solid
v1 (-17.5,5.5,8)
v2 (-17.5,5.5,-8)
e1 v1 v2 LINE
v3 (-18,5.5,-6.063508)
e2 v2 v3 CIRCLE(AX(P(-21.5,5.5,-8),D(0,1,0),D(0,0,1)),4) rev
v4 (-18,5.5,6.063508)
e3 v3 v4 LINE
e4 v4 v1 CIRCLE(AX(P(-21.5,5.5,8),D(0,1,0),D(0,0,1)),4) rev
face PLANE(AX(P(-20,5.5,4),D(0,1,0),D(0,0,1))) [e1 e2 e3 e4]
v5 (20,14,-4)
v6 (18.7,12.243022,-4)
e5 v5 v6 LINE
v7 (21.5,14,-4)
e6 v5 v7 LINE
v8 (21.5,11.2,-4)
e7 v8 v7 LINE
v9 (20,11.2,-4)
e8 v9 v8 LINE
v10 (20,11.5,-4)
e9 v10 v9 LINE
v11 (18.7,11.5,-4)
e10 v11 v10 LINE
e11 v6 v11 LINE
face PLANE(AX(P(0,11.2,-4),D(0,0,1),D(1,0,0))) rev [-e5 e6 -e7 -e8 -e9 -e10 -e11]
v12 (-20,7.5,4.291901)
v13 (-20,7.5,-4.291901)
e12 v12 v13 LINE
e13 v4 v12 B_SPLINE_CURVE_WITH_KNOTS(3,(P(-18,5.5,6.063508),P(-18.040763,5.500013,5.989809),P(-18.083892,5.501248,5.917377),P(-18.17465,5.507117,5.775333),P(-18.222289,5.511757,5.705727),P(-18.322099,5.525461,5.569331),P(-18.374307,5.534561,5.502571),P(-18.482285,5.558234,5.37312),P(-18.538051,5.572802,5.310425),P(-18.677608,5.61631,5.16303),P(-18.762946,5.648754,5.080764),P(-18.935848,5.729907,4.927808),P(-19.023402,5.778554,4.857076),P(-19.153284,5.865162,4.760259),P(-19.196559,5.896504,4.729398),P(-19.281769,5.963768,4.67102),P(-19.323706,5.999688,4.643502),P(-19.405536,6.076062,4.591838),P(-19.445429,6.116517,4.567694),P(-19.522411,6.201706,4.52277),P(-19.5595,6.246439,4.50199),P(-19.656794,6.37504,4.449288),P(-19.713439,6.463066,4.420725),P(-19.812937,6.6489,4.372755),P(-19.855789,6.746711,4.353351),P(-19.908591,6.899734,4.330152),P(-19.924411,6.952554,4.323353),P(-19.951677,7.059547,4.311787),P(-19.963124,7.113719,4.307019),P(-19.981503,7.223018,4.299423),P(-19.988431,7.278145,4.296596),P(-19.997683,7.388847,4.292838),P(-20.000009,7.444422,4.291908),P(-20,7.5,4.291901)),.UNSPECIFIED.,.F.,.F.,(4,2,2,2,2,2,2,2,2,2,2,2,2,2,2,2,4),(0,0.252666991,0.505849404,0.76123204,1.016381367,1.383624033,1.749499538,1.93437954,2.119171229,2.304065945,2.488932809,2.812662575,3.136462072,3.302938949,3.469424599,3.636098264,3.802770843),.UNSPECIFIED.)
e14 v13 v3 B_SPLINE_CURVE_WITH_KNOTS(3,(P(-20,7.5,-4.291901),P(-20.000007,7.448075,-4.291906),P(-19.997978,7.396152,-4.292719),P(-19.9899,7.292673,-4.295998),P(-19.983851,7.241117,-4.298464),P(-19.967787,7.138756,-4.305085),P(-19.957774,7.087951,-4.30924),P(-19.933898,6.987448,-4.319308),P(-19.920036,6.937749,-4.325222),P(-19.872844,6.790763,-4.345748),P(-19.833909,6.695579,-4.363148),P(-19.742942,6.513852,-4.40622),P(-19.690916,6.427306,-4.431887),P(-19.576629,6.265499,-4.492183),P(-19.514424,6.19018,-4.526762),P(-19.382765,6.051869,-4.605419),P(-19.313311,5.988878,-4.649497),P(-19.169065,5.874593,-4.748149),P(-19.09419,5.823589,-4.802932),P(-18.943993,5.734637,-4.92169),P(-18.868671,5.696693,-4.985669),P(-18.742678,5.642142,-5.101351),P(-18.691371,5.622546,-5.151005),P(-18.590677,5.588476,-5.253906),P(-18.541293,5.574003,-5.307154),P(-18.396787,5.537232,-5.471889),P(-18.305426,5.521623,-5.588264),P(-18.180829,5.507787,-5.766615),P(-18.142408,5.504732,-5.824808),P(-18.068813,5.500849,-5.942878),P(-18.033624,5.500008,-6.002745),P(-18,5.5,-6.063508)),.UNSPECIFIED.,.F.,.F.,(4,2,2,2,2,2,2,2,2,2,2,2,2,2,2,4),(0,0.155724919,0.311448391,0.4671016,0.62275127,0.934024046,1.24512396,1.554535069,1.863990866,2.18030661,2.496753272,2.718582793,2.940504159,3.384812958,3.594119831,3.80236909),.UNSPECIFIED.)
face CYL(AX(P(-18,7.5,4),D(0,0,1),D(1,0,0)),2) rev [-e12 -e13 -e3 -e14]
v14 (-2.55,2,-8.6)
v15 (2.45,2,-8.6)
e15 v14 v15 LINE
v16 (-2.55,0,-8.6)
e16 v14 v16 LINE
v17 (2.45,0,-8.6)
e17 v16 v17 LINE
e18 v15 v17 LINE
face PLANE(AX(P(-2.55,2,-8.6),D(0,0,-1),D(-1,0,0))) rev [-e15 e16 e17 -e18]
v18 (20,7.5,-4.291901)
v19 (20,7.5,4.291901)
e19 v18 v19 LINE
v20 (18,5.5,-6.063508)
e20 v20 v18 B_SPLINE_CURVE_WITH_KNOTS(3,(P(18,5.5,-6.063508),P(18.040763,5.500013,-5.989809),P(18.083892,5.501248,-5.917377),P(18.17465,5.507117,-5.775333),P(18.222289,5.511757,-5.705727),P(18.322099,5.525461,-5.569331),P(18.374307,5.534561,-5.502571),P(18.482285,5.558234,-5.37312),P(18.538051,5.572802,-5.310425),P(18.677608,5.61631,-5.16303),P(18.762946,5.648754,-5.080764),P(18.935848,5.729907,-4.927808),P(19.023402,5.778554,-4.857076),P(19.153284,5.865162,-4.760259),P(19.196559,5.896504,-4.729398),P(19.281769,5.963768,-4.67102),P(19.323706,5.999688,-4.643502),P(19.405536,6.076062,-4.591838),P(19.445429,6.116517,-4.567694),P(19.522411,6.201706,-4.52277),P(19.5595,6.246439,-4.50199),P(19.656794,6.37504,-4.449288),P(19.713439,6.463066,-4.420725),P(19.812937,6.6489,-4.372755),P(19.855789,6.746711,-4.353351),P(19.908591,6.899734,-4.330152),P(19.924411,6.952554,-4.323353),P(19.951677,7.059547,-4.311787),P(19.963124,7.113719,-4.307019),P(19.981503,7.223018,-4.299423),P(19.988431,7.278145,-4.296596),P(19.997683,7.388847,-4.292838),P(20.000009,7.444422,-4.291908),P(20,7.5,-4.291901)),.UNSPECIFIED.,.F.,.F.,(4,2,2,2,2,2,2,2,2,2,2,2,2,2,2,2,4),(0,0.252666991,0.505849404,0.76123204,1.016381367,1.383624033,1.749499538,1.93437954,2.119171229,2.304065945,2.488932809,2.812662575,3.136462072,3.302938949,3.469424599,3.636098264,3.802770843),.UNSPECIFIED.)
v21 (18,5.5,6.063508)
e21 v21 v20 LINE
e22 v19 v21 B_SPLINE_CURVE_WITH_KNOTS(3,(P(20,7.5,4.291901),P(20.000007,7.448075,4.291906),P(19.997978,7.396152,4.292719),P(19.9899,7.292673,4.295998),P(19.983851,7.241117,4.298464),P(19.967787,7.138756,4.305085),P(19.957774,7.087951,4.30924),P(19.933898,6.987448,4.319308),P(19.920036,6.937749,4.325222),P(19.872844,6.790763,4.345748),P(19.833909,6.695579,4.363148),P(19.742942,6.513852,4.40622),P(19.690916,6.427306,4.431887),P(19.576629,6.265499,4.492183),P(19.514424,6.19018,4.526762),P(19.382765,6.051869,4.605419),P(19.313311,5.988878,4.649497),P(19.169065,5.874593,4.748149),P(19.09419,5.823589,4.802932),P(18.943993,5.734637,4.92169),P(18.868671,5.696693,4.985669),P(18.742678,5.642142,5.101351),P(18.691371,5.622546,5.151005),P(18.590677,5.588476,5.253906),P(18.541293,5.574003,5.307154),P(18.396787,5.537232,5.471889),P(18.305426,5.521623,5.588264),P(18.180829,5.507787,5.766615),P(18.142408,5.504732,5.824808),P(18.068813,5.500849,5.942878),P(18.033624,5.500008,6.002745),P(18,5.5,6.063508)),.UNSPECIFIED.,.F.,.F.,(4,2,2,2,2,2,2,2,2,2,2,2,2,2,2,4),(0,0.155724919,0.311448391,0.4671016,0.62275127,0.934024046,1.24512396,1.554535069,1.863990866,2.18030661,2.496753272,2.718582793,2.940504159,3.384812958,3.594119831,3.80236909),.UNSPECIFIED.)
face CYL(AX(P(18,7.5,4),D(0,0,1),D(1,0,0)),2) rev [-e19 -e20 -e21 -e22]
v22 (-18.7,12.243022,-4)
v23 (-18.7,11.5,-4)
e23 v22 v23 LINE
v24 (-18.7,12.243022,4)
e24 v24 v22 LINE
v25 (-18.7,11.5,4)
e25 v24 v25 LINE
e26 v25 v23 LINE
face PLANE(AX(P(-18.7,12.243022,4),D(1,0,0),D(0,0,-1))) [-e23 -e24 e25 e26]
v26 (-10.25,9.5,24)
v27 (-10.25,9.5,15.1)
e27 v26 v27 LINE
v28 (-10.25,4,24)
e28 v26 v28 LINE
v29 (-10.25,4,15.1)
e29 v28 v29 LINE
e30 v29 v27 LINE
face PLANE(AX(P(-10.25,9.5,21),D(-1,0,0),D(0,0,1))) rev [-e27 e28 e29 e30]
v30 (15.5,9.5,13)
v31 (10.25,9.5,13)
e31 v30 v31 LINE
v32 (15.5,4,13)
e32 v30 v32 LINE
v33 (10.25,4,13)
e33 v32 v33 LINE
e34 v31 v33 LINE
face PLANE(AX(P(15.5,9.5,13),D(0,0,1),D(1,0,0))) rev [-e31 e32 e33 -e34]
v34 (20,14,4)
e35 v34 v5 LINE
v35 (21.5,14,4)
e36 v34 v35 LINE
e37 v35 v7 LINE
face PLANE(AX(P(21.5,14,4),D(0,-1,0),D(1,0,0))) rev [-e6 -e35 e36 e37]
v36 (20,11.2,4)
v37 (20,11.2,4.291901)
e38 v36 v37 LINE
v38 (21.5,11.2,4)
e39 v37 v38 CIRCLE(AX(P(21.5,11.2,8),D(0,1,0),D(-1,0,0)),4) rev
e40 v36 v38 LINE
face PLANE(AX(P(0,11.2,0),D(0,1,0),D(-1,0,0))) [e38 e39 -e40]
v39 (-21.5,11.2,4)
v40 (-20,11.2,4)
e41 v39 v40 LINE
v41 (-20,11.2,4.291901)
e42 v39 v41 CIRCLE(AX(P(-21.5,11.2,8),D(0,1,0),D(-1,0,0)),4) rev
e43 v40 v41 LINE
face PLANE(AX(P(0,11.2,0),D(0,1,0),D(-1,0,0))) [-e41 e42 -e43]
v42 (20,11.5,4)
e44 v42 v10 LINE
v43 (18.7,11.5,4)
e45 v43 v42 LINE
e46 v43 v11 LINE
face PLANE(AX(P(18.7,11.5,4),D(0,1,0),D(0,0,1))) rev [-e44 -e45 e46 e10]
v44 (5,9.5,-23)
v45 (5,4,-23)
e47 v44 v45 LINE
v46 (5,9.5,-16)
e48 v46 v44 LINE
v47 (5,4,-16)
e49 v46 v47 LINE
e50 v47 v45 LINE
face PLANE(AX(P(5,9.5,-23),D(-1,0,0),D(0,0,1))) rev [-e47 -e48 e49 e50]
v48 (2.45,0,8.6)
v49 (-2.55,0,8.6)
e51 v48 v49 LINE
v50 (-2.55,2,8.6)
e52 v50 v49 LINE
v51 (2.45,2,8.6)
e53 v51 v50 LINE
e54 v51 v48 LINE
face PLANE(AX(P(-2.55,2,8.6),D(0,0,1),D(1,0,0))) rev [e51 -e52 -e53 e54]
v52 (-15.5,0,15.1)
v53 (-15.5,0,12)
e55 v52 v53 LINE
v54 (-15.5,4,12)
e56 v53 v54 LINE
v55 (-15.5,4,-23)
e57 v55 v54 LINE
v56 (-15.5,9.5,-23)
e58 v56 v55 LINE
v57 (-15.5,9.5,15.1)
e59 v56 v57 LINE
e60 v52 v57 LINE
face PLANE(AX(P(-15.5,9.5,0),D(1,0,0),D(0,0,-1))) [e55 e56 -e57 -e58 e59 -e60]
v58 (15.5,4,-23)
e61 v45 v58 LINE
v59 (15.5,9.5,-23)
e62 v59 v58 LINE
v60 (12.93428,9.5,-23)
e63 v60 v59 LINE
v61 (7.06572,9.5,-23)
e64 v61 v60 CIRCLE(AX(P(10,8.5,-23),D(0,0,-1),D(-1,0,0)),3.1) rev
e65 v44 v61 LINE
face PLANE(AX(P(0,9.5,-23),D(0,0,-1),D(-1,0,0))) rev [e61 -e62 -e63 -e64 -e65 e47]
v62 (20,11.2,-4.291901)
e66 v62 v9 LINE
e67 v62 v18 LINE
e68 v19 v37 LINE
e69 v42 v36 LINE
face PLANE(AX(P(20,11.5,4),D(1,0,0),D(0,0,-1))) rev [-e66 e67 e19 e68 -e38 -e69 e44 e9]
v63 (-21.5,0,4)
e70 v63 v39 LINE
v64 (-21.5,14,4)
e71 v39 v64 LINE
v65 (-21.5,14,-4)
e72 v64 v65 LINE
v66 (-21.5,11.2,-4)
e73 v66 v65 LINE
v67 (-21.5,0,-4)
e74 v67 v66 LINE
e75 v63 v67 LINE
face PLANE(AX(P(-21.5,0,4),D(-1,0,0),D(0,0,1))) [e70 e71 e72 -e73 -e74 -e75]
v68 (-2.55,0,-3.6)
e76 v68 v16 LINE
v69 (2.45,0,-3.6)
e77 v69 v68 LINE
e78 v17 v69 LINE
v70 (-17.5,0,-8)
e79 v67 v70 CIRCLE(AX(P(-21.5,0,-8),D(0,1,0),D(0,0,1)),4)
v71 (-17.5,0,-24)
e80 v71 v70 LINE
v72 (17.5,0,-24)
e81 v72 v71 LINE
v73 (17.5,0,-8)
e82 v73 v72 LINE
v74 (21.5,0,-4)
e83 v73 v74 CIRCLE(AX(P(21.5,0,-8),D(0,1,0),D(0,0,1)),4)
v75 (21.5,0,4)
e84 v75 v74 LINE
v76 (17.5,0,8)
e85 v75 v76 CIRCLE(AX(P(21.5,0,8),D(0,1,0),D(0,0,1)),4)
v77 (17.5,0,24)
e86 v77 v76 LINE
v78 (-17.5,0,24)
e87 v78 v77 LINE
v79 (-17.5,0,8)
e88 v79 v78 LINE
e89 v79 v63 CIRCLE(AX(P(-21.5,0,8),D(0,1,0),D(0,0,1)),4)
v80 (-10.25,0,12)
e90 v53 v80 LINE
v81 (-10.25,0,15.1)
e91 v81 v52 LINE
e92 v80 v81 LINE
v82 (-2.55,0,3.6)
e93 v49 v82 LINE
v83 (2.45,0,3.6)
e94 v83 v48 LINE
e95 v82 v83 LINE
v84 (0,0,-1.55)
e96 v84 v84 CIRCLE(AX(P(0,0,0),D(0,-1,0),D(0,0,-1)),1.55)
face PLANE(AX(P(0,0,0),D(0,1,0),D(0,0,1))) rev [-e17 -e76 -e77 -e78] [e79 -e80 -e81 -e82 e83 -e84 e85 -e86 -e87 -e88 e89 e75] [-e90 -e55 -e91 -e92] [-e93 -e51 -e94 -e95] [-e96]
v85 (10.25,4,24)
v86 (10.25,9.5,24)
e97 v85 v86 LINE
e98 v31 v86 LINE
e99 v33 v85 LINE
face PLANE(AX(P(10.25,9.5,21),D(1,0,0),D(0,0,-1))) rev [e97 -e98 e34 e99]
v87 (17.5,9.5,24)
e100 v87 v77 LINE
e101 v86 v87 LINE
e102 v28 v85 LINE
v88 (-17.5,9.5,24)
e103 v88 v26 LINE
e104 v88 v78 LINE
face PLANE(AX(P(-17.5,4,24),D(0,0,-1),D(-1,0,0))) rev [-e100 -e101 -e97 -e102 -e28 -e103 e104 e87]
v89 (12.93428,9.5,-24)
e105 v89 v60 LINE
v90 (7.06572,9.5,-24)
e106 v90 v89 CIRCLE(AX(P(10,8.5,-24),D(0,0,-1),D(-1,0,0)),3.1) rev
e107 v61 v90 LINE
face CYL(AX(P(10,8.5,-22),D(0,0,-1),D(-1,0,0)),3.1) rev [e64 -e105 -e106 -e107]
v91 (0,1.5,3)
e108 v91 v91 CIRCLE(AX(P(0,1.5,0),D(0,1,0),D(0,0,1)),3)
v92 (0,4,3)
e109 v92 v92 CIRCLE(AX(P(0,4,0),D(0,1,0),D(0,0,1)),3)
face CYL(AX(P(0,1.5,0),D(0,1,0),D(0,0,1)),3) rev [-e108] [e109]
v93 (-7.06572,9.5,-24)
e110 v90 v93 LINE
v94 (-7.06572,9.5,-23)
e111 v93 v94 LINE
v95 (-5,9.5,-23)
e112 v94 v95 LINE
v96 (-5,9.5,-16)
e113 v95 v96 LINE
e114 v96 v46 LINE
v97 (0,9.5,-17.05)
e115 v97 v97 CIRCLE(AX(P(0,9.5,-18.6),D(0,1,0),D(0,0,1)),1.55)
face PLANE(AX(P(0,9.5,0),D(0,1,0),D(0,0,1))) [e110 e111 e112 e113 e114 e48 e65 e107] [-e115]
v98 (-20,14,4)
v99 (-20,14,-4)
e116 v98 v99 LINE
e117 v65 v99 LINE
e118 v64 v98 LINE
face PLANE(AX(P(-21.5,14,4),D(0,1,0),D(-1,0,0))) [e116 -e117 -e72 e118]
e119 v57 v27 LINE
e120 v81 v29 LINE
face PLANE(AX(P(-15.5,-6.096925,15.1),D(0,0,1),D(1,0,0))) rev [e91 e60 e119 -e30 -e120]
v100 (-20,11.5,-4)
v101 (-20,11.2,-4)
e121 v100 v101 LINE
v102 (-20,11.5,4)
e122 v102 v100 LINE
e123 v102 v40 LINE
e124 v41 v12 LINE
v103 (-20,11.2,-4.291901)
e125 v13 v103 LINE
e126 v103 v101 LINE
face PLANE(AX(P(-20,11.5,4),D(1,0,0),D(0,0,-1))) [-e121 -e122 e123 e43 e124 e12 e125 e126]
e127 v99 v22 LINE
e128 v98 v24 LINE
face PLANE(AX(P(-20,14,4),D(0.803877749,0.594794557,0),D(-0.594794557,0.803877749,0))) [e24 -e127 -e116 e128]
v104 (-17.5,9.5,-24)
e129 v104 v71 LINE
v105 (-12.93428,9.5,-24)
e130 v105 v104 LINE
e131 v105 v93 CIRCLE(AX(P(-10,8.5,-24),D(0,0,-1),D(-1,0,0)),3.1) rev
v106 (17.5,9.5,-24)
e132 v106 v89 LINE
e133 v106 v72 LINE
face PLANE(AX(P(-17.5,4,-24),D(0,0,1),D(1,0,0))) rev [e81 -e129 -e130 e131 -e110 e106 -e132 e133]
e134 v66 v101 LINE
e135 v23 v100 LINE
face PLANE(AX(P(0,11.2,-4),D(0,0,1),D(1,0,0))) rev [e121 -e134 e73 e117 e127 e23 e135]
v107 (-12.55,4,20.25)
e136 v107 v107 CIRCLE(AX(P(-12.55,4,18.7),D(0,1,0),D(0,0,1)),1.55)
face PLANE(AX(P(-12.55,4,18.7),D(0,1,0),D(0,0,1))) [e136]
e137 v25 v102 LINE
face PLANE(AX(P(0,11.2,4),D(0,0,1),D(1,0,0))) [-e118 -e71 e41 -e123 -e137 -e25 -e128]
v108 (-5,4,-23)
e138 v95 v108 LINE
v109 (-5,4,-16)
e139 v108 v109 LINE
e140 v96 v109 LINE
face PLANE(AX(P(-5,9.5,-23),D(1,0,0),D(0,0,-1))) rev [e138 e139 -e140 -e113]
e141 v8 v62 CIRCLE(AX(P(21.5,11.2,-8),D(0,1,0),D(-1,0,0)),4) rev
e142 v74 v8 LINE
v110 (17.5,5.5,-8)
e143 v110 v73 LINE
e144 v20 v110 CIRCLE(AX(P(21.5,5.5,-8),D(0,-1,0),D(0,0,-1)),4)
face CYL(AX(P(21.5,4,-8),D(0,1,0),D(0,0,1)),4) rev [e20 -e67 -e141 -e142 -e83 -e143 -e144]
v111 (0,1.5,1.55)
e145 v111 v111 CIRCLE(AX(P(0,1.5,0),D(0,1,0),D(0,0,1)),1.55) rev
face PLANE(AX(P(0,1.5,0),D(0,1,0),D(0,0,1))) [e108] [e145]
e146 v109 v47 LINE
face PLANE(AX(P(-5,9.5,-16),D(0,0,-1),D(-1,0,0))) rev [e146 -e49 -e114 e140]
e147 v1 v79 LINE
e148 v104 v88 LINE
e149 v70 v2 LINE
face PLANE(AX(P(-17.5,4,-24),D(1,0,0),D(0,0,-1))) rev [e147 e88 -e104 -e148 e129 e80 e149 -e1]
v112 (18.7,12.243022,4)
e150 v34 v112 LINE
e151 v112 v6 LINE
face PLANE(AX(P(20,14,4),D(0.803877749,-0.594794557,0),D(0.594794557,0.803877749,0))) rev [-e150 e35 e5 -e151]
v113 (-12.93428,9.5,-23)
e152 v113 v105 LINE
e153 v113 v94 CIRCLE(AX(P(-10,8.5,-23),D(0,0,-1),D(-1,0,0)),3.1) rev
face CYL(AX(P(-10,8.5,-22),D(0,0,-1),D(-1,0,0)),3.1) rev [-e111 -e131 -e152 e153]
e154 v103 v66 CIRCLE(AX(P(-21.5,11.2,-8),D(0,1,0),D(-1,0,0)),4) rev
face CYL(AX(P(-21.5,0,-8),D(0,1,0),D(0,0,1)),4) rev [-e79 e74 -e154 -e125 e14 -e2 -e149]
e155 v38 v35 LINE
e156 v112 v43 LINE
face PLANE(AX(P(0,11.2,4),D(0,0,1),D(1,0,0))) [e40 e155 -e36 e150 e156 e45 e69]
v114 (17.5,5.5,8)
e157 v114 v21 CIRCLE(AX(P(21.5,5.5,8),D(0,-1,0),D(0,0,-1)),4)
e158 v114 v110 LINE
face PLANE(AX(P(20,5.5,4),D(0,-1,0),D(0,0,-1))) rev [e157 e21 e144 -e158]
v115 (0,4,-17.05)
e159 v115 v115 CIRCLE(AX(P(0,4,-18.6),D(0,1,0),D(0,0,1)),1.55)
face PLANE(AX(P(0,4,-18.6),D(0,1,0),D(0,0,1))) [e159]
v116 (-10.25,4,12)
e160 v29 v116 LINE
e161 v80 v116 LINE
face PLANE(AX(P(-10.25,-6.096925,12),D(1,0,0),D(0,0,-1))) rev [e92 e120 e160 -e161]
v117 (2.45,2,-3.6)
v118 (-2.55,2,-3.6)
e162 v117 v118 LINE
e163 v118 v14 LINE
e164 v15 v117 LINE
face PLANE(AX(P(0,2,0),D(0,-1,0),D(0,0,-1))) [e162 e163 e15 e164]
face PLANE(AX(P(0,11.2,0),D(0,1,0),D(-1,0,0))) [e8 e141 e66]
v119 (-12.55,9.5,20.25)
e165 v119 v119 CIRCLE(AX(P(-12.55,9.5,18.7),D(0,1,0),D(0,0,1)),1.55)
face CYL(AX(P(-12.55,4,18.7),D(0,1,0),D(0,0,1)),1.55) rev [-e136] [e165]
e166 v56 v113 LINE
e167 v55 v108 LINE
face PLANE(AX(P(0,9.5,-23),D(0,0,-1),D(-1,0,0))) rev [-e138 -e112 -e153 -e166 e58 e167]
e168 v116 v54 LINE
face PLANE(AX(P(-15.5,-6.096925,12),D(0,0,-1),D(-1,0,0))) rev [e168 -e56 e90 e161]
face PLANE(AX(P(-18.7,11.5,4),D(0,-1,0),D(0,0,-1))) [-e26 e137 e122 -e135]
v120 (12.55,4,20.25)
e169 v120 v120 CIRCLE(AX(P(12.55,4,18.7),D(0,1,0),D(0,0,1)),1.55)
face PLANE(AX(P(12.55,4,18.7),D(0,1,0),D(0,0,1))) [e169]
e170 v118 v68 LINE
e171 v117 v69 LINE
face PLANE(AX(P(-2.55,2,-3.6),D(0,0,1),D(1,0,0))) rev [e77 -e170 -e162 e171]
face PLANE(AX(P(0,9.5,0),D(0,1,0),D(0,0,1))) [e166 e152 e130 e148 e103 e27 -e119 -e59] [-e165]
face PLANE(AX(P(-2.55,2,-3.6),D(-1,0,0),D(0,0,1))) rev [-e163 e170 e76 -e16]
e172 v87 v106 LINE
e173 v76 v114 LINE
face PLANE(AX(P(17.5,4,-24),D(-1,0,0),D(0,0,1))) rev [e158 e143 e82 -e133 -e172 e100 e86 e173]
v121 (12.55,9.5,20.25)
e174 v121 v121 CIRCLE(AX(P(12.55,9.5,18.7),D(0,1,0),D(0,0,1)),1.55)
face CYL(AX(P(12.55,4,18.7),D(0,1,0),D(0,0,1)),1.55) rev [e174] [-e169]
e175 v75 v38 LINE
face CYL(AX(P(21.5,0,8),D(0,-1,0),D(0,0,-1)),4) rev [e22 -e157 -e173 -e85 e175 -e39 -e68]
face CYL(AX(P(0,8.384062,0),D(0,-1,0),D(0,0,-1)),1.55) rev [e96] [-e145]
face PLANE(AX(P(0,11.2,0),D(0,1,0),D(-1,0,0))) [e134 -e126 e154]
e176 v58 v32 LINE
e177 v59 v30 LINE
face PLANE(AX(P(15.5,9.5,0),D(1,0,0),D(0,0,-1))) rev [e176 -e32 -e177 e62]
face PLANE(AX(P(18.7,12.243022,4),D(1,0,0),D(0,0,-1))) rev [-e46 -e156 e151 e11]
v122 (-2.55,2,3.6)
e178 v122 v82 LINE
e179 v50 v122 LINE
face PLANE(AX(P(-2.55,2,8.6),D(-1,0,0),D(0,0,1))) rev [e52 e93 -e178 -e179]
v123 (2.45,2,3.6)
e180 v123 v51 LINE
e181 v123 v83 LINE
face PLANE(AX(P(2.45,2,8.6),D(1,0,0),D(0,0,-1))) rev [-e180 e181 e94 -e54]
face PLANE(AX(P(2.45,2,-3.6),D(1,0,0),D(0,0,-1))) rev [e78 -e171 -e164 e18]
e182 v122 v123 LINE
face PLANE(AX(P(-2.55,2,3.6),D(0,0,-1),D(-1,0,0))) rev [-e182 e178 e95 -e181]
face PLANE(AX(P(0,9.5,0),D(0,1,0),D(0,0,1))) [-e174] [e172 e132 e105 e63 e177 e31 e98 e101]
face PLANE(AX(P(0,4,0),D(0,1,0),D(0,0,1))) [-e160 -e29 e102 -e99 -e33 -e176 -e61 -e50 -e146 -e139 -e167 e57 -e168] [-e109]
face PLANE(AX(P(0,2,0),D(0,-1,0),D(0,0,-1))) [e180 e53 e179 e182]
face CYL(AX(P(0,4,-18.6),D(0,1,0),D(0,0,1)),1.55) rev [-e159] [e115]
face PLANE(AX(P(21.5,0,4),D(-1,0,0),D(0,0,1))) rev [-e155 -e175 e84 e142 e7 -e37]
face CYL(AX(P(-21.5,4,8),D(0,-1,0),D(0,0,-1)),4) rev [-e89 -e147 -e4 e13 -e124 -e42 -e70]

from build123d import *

# Parameters (mm, degrees)
SKETCH1_W           = 35
SKETCH1_H           = 48
BOSS_EXTRUDE1_DEPTH = 4
SKETCH2_W           = 35
SKETCH2_H           = 48
SKETCH2_W_2         = 31
SKETCH2_H_2         = 44
BOSS_EXTRUDE2_DEPTH = 5.5
SKETCH3_W           = 10
SKETCH3_H           = 7
SKETCH3_W_2         = 5.25
SKETCH3_H_2         = 8
BOSS_EXTRUDE3_DEPTH = 5.5
SKETCH4_W           = 20.5
SKETCH4_H           = 5.5
CUT_EXTRUDE1_DEPTH  = 11
CUT_EXTRUDE2_DEPTH  = 2
CUT_EXTRUDE3_REACH  = 33.185
SKETCH7_W           = 5.25
SKETCH7_H           = 3.1
CUT_EXTRUDE4_START  = 9.5
SKETCH8_R           = 1.55
CUT_EXTRUDE4_DEPTH  = 5.5
SKETCH5_W           = 5
SKETCH5_H           = 5
CUT_EXTRUDE5_DEPTH  = 2
SKETCH10_R          = 1.55
CUT_EXTRUDE6_DEPTH  = 4
SKETCH11_R          = 3
CUT_EXTRUDE7_DEPTH  = 2.5
BOSS_EXTRUDE5_DEPTH = 4
FILLET1_R           = 4
FILLET2_R           = 2
FILLET3_R           = 4
FILLET4_R           = 2
SKETCH14_W          = 45
SKETCH14_H          = 12
CUT_EXTRUDE11_DEPTH = 2.8


with BuildPart() as part:
    # Sketch1 → Boss-Extrude1 (new body)
    with BuildSketch(Plane(origin=(0, 0, 0), x_dir=(1, 0, 0), z_dir=(0, 1, 0))):
        Rectangle(SKETCH1_W, SKETCH1_H)
    extrude(amount=BOSS_EXTRUDE1_DEPTH)

    # Sketch2 → Boss-Extrude2 (add)
    with BuildSketch(Plane(origin=(0, 4, 0), x_dir=(1, 0, 0), z_dir=(0, 1, 0))):
        Rectangle(SKETCH2_W, SKETCH2_H)
        with Locations((0, 1)):
            Rectangle(SKETCH2_W_2, SKETCH2_H_2, mode=Mode.SUBTRACT)
    extrude(amount=BOSS_EXTRUDE2_DEPTH)

    # Sketch3 → Boss-Extrude3 (add)
    with BuildSketch(Plane(origin=(0, 4, 0), x_dir=(1, 0, 0), z_dir=(0, 1, 0))):
        with Locations((0, 19.5)):
            Rectangle(SKETCH3_W, SKETCH3_H)
        with Locations((-12.875, -17)):
            Rectangle(SKETCH3_W_2, SKETCH3_H_2)
        with Locations((12.875, -17)):
            Rectangle(SKETCH3_W_2, SKETCH3_H_2)
    extrude(amount=BOSS_EXTRUDE3_DEPTH)

    # Sketch4 → Cut-Extrude1 (cut)
    with BuildSketch(Plane.XY.offset(24)):
        with Locations((0, 6.75)):
            Rectangle(SKETCH4_W, SKETCH4_H)
    extrude(amount=-CUT_EXTRUDE1_DEPTH, mode=Mode.SUBTRACT)

    # Sketch6 → Cut-Extrude2 (cut)
    with BuildSketch(Plane(origin=(0, 0, -24), x_dir=(-1, 0, 0), z_dir=(0, 0, -1))):
        with BuildLine():
            ThreePointArc((-12.93428015, 9.5), (-10, 5.4), (-7.06571985, 9.5))
            Line((-7.06571985, 9.5), (-12.93428015, 9.5))
        make_face()
        with BuildLine():
            Line((12.93428015, 9.5), (7.06571985, 9.5))
            ThreePointArc((7.06571985, 9.5), (10, 5.4), (12.93428015, 9.5))
        make_face()
    extrude(amount=-CUT_EXTRUDE2_DEPTH, mode=Mode.SUBTRACT)

    # Cut-Extrude3: up to this face of the body (flat: up to its plane)
    cut_extrude3_end = Plane(part.part.faces().sort_by_distance((0, 0, 0))[0])
    # Sketch7 → Cut-Extrude3 (cut, up to the picked face)
    with BuildSketch(Plane(origin=(0, 9.5, 0), x_dir=(1, 0, 0), z_dir=(0, 1, 0)), mode=Mode.PRIVATE) as cut_extrude3_sk1:
        with Locations((-12.875, -13.55)):
            Rectangle(SKETCH7_W, SKETCH7_H)
    cut_extrude3_tool1 = split(extrude(cut_extrude3_sk1.sketch, amount=-CUT_EXTRUDE3_REACH, mode=Mode.PRIVATE), bisect_by=cut_extrude3_end, keep=Keep.BOTH, mode=Mode.PRIVATE)
    add(cut_extrude3_tool1.solids().sort_by(Axis((-12.875, 9.5, 13.55), (0, -1, 0)))[0], mode=Mode.SUBTRACT)

    # Sketch8 → Cut-Extrude4 (cut)
    with BuildSketch(Plane(origin=(0, 0, 0), x_dir=(1, 0, 0), z_dir=(0, 1, 0)).offset(CUT_EXTRUDE4_START)):
        with Locations(Location((-12.55, -18.7, 0), (0, 0, 270))):
            Circle(SKETCH8_R)
        with Locations(Location((12.55, -18.7, 0), (0, 0, 270))):
            Circle(SKETCH8_R)
        with Locations(Location((0, 18.6, 0), (0, 0, 270))):
            Circle(SKETCH8_R)
    extrude(amount=-CUT_EXTRUDE4_DEPTH, mode=Mode.SUBTRACT)

    # Sketch5 → Cut-Extrude5 (cut)
    with BuildSketch(Plane.XZ):
        with Locations((-0.05, 6.1)):
            Rectangle(SKETCH5_W, SKETCH5_H)
        with Locations((-0.05, -6.1)):
            Rectangle(SKETCH5_W, SKETCH5_H)
    extrude(amount=-CUT_EXTRUDE5_DEPTH, mode=Mode.SUBTRACT)

    # Sketch10 → Cut-Extrude6 (cut)
    with BuildSketch(Plane.XZ):
        with Locations(Location((0, 0, 0), (0, 0, 270))):
            Circle(SKETCH10_R)
    extrude(amount=-CUT_EXTRUDE6_DEPTH, mode=Mode.SUBTRACT)

    # Sketch11 → Cut-Extrude7 (cut)
    with BuildSketch(Plane(origin=(0, 4, 0), x_dir=(1, 0, 0), z_dir=(0, 1, 0))):
        with Locations(Location((0, 0, 0), (0, 0, 270))):
            Circle(SKETCH11_R)
    extrude(amount=-CUT_EXTRUDE7_DEPTH, mode=Mode.SUBTRACT)

    # Sketch13 → Boss-Extrude5 (add, symmetric)
    with BuildSketch(Plane.XY):
        Polygon((17.5, 0), (21.5, 0), (21.5, 14), (20, 14), (18.7, 12.243021796), (18.7, 11.5), (20, 11.5), (20, 5.5), (17.5, 5.5), align=None)
    boss_extrude5 = extrude(amount=BOSS_EXTRUDE5_DEPTH, both=True)

    # Fillet1
    # the kernel refuses this fillet: 4 mm, written as the material it adds along each edge
    with BuildSketch(Plane(origin=(17.5, 15.5, -4), x_dir=(0, 0, -1), z_dir=(0, -1, 0))) as fillet1_piece_1_section:
        with BuildLine():
            CenterArc((FILLET1_R, FILLET1_R), FILLET1_R, 180, 90)
            Line((0, FILLET1_R), (0, 0))
            Line((0, 0), (FILLET1_R, 0))
        make_face()
    fillet1_piece_1 = extrude(amount=15.5, mode=Mode.PRIVATE)
    fillet1_piece_1 = split(fillet1_piece_1, bisect_by=Plane(origin=(20.372208791, 14, -4.086993852), z_dir=(0, -1, 0)), keep=Keep.TOP, mode=Mode.PRIVATE)
    fillet1_piece_1 = split(fillet1_piece_1, bisect_by=Plane(origin=(20, 12.75, -4.086993852), z_dir=(1, 0, 0)), keep=Keep.TOP, mode=Mode.PRIVATE)
    add(fillet1_piece_1)
    with BuildSketch(Plane(origin=(17.5, 15.5, -4), x_dir=(0, 0, -1), z_dir=(0, -1, 0))) as fillet1_piece_2_section:
        with BuildLine():
            CenterArc((FILLET1_R, FILLET1_R), FILLET1_R, 180, 90)
            Line((0, FILLET1_R), (0, 0))
            Line((0, 0), (FILLET1_R, 0))
        make_face()
    fillet1_piece_2 = extrude(amount=25.5, mode=Mode.PRIVATE)
    fillet1_piece_2 = split(fillet1_piece_2, bisect_by=Plane(origin=(18.94916854, 12.579778484, -4.333743355), z_dir=(0.8038777485339549, -0.5947945573153639, 0)), keep=Keep.TOP, mode=Mode.PRIVATE)
    fillet1_piece_2 = split(fillet1_piece_2, bisect_by=Plane(origin=(18.7, 12.297602293, -4.333743355), z_dir=(1, 0, 0)), keep=Keep.TOP, mode=Mode.PRIVATE)
    fillet1_piece_2 = split(fillet1_piece_2, bisect_by=Plane(origin=(19.330535784, 11.5, -4.333743355), z_dir=(0, 1, 0)), keep=Keep.TOP, mode=Mode.PRIVATE)
    fillet1_piece_2 = split(fillet1_piece_2, bisect_by=Plane(origin=(20, 12.297602293, -4.333743355), z_dir=(-1, 0, 0)), keep=Keep.TOP, mode=Mode.PRIVATE)
    add(fillet1_piece_2)
    with BuildSketch(Plane(origin=(17.5, 5.5, -4), x_dir=(0, 0, -1), z_dir=(0, -1, 0))) as fillet1_piece_3:
        with BuildLine():
            CenterArc((FILLET1_R, FILLET1_R), FILLET1_R, 180, 90)
            Line((0, FILLET1_R), (0, 0))
            Line((0, 0), (FILLET1_R, 0))
        make_face()
    extrude(amount=5.5)
    with BuildSketch(Plane(origin=(17.5, 15.5, 4), x_dir=(0, 0, 1), z_dir=(0, -1, 0))) as fillet1_piece_4_section:
        with BuildLine():
            CenterArc((FILLET1_R, -FILLET1_R), FILLET1_R, 90, 90)
            Line((0, -FILLET1_R), (0, 0))
            Line((0, 0), (FILLET1_R, 0))
        make_face()
    fillet1_piece_4 = extrude(amount=15.5, mode=Mode.PRIVATE)
    fillet1_piece_4 = split(fillet1_piece_4, bisect_by=Plane(origin=(20.372208791, 14, 4.086993852), z_dir=(0, -1, 0)), keep=Keep.TOP, mode=Mode.PRIVATE)
    fillet1_piece_4 = split(fillet1_piece_4, bisect_by=Plane(origin=(20, 12.75, 4.086993852), z_dir=(1, 0, 0)), keep=Keep.TOP, mode=Mode.PRIVATE)
    add(fillet1_piece_4)
    with BuildSketch(Plane(origin=(17.5, 15.5, 4), x_dir=(0, 0, 1), z_dir=(0, -1, 0))) as fillet1_piece_5_section:
        with BuildLine():
            CenterArc((FILLET1_R, -FILLET1_R), FILLET1_R, 90, 90)
            Line((0, -FILLET1_R), (0, 0))
            Line((0, 0), (FILLET1_R, 0))
        make_face()
    fillet1_piece_5 = extrude(amount=25.5, mode=Mode.PRIVATE)
    fillet1_piece_5 = split(fillet1_piece_5, bisect_by=Plane(origin=(18.94916854, 12.579778484, 4.333743355), z_dir=(0.8038777485339549, -0.5947945573153639, 0)), keep=Keep.TOP, mode=Mode.PRIVATE)
    fillet1_piece_5 = split(fillet1_piece_5, bisect_by=Plane(origin=(18.7, 12.297602293, 4.333743355), z_dir=(1, 0, 0)), keep=Keep.TOP, mode=Mode.PRIVATE)
    fillet1_piece_5 = split(fillet1_piece_5, bisect_by=Plane(origin=(19.330535784, 11.5, 4.333743355), z_dir=(0, 1, 0)), keep=Keep.TOP, mode=Mode.PRIVATE)
    fillet1_piece_5 = split(fillet1_piece_5, bisect_by=Plane(origin=(20, 12.297602293, 4.333743355), z_dir=(-1, 0, 0)), keep=Keep.TOP, mode=Mode.PRIVATE)
    add(fillet1_piece_5)
    with BuildSketch(Plane(origin=(17.5, 5.5, 4), x_dir=(0, 0, 1), z_dir=(0, -1, 0))) as fillet1_piece_6:
        with BuildLine():
            CenterArc((FILLET1_R, -FILLET1_R), FILLET1_R, 90, 90)
            Line((0, -FILLET1_R), (0, 0))
            Line((0, 0), (FILLET1_R, 0))
        make_face()
    extrude(amount=5.5)

    # Fillet2
    fillet2_edges = [part.edges().sort_by_distance(p)[0] for p in [
        (20, 5.5, 0),
    ]]
    fillet(fillet2_edges, radius=FILLET2_R)

    # Mirror4: Boss-Extrude5 across plane
    add(boss_extrude5.mirror(Plane(origin=(0, 0, 0), x_dir=(0, 0, 1), z_dir=(1, 0, 0))))

    # Fillet3
    # the kernel refuses this fillet: 4 mm, written as the material it adds along each edge
    with BuildSketch(Plane(origin=(-17.5, 15.5, 4), x_dir=(0, 0, 1), z_dir=(0, -1, 0))) as fillet3_piece_1_section:
        with BuildLine():
            CenterArc((FILLET3_R, FILLET3_R), FILLET3_R, 180, 90)
            Line((0, FILLET3_R), (0, 0))
            Line((0, 0), (FILLET3_R, 0))
        make_face()
    fillet3_piece_1 = extrude(amount=25.5, mode=Mode.PRIVATE)
    fillet3_piece_1 = split(fillet3_piece_1, bisect_by=Plane(origin=(-19.330535784, 14, 4.333743355), z_dir=(0, -1, 0)), keep=Keep.TOP, mode=Mode.PRIVATE)
    fillet3_piece_1 = split(fillet3_piece_1, bisect_by=Plane(origin=(-18.94916854, 12.579778484, 4.333743355), z_dir=(-0.8038777485339549, -0.5947945573153639, 0)), keep=Keep.TOP, mode=Mode.PRIVATE)
    fillet3_piece_1 = split(fillet3_piece_1, bisect_by=Plane(origin=(-18.7, 12.297602293, 4.333743355), z_dir=(-1, 0, 0)), keep=Keep.TOP, mode=Mode.PRIVATE)
    fillet3_piece_1 = split(fillet3_piece_1, bisect_by=Plane(origin=(-19.330535784, 11.5, 4.333743355), z_dir=(0, 1, 0)), keep=Keep.TOP, mode=Mode.PRIVATE)
    add(fillet3_piece_1)
    with BuildSketch(Plane(origin=(-17.5, 15.5, 4), x_dir=(0, 0, 1), z_dir=(0, -1, 0))) as fillet3_piece_2_section:
        with BuildLine():
            CenterArc((FILLET3_R, FILLET3_R), FILLET3_R, 180, 90)
            Line((0, FILLET3_R), (0, 0))
            Line((0, 0), (FILLET3_R, 0))
        make_face()
    fillet3_piece_2 = extrude(amount=15.5, mode=Mode.PRIVATE)
    fillet3_piece_2 = split(fillet3_piece_2, bisect_by=Plane(origin=(-20.372208791, 11.5, 4.086993852), z_dir=(0, -1, 0)), keep=Keep.TOP, mode=Mode.PRIVATE)
    fillet3_piece_2 = split(fillet3_piece_2, bisect_by=Plane(origin=(-20, 10.5, 4.086993852), z_dir=(-1, 0, 0)), keep=Keep.TOP, mode=Mode.PRIVATE)
    add(fillet3_piece_2)
    with BuildSketch(Plane(origin=(-17.5, 5.5, 4), x_dir=(0, 0, 1), z_dir=(0, -1, 0))) as fillet3_piece_3:
        with BuildLine():
            CenterArc((FILLET3_R, FILLET3_R), FILLET3_R, 180, 90)
            Line((0, FILLET3_R), (0, 0))
            Line((0, 0), (FILLET3_R, 0))
        make_face()
    extrude(amount=5.5)
    with BuildSketch(Plane(origin=(-17.5, 15.5, -4), x_dir=(0, 0, -1), z_dir=(0, -1, 0))) as fillet3_piece_4_section:
        with BuildLine():
            CenterArc((FILLET3_R, -FILLET3_R), FILLET3_R, 90, 90)
            Line((0, -FILLET3_R), (0, 0))
            Line((0, 0), (FILLET3_R, 0))
        make_face()
    fillet3_piece_4 = extrude(amount=25.5, mode=Mode.PRIVATE)
    fillet3_piece_4 = split(fillet3_piece_4, bisect_by=Plane(origin=(-19.330535784, 14, -4.333743355), z_dir=(0, -1, 0)), keep=Keep.TOP, mode=Mode.PRIVATE)
    fillet3_piece_4 = split(fillet3_piece_4, bisect_by=Plane(origin=(-18.94916854, 12.579778484, -4.333743355), z_dir=(-0.8038777485339549, -0.5947945573153639, 0)), keep=Keep.TOP, mode=Mode.PRIVATE)
    fillet3_piece_4 = split(fillet3_piece_4, bisect_by=Plane(origin=(-18.7, 12.297602293, -4.333743355), z_dir=(-1, 0, 0)), keep=Keep.TOP, mode=Mode.PRIVATE)
    fillet3_piece_4 = split(fillet3_piece_4, bisect_by=Plane(origin=(-19.330535784, 11.5, -4.333743355), z_dir=(0, 1, 0)), keep=Keep.TOP, mode=Mode.PRIVATE)
    add(fillet3_piece_4)
    with BuildSketch(Plane(origin=(-17.5, 15.5, -4), x_dir=(0, 0, -1), z_dir=(0, -1, 0))) as fillet3_piece_5_section:
        with BuildLine():
            CenterArc((FILLET3_R, -FILLET3_R), FILLET3_R, 90, 90)
            Line((0, -FILLET3_R), (0, 0))
            Line((0, 0), (FILLET3_R, 0))
        make_face()
    fillet3_piece_5 = extrude(amount=15.5, mode=Mode.PRIVATE)
    fillet3_piece_5 = split(fillet3_piece_5, bisect_by=Plane(origin=(-20.372208791, 11.5, -4.086993852), z_dir=(0, -1, 0)), keep=Keep.TOP, mode=Mode.PRIVATE)
    fillet3_piece_5 = split(fillet3_piece_5, bisect_by=Plane(origin=(-20, 10.5, -4.086993852), z_dir=(-1, 0, 0)), keep=Keep.TOP, mode=Mode.PRIVATE)
    add(fillet3_piece_5)
    with BuildSketch(Plane(origin=(-17.5, 5.5, -4), x_dir=(0, 0, -1), z_dir=(0, -1, 0))) as fillet3_piece_6:
        with BuildLine():
            CenterArc((FILLET3_R, -FILLET3_R), FILLET3_R, 90, 90)
            Line((0, -FILLET3_R), (0, 0))
            Line((0, 0), (FILLET3_R, 0))
        make_face()
    extrude(amount=5.5)

    # Fillet4
    fillet4_edges = [part.edges().sort_by_distance(p)[0] for p in [
        (-20, 5.5, 0),
    ]]
    fillet(fillet4_edges, radius=FILLET4_R)

    # Sketch14 → Cut-Extrude11 (cut)
    # profile 1 of 3: a face of its own
    with BuildSketch(Plane(origin=(0, 14, 0), x_dir=(1, 0, 0), z_dir=(0, 1, 0))):
        Rectangle(SKETCH14_W, SKETCH14_H)
        with BuildLine():
            Line((-21.5, -4), (-21.5, 4))
            Line((-21.5, 4), (20, 4))
            Line((20, 4), (20, 4.291900756))
            ThreePointArc((20, 4.291900756), (20.73593095, 4.07365329), (21.5, 4))
            Line((21.5, 4), (21.5, -4))
            ThreePointArc((21.5, -4), (20.73593095, -4.07365329), (20, -4.291900756))
            Line((20, -4.291900756), (20, -4))
            Line((20, -4), (-21.5, -4))
        make_face(mode=Mode.SUBTRACT)
    # profile 2 of 3: a face of its own
    with BuildSketch(Plane(origin=(0, 14, 0), x_dir=(1, 0, 0), z_dir=(0, 1, 0))):
        with BuildLine():
            Line((20, 4.291900756), (20, 4))
            Line((20, 4), (21.5, 4))
            ThreePointArc((21.5, 4), (20.73593095, 4.07365329), (20, 4.291900756))
        make_face()
    # profile 3 of 3: a face of its own
    with BuildSketch(Plane(origin=(0, 14, 0), x_dir=(1, 0, 0), z_dir=(0, 1, 0))):
        with BuildLine():
            Line((21.5, -4), (20, -4))
            Line((20, -4), (20, -4.291900756))
            ThreePointArc((20, -4.291900756), (20.73593095, -4.07365329), (21.5, -4))
        make_face()
    extrude(amount=-CUT_EXTRUDE11_DEPTH, mode=Mode.SUBTRACT)


solid = part.part
